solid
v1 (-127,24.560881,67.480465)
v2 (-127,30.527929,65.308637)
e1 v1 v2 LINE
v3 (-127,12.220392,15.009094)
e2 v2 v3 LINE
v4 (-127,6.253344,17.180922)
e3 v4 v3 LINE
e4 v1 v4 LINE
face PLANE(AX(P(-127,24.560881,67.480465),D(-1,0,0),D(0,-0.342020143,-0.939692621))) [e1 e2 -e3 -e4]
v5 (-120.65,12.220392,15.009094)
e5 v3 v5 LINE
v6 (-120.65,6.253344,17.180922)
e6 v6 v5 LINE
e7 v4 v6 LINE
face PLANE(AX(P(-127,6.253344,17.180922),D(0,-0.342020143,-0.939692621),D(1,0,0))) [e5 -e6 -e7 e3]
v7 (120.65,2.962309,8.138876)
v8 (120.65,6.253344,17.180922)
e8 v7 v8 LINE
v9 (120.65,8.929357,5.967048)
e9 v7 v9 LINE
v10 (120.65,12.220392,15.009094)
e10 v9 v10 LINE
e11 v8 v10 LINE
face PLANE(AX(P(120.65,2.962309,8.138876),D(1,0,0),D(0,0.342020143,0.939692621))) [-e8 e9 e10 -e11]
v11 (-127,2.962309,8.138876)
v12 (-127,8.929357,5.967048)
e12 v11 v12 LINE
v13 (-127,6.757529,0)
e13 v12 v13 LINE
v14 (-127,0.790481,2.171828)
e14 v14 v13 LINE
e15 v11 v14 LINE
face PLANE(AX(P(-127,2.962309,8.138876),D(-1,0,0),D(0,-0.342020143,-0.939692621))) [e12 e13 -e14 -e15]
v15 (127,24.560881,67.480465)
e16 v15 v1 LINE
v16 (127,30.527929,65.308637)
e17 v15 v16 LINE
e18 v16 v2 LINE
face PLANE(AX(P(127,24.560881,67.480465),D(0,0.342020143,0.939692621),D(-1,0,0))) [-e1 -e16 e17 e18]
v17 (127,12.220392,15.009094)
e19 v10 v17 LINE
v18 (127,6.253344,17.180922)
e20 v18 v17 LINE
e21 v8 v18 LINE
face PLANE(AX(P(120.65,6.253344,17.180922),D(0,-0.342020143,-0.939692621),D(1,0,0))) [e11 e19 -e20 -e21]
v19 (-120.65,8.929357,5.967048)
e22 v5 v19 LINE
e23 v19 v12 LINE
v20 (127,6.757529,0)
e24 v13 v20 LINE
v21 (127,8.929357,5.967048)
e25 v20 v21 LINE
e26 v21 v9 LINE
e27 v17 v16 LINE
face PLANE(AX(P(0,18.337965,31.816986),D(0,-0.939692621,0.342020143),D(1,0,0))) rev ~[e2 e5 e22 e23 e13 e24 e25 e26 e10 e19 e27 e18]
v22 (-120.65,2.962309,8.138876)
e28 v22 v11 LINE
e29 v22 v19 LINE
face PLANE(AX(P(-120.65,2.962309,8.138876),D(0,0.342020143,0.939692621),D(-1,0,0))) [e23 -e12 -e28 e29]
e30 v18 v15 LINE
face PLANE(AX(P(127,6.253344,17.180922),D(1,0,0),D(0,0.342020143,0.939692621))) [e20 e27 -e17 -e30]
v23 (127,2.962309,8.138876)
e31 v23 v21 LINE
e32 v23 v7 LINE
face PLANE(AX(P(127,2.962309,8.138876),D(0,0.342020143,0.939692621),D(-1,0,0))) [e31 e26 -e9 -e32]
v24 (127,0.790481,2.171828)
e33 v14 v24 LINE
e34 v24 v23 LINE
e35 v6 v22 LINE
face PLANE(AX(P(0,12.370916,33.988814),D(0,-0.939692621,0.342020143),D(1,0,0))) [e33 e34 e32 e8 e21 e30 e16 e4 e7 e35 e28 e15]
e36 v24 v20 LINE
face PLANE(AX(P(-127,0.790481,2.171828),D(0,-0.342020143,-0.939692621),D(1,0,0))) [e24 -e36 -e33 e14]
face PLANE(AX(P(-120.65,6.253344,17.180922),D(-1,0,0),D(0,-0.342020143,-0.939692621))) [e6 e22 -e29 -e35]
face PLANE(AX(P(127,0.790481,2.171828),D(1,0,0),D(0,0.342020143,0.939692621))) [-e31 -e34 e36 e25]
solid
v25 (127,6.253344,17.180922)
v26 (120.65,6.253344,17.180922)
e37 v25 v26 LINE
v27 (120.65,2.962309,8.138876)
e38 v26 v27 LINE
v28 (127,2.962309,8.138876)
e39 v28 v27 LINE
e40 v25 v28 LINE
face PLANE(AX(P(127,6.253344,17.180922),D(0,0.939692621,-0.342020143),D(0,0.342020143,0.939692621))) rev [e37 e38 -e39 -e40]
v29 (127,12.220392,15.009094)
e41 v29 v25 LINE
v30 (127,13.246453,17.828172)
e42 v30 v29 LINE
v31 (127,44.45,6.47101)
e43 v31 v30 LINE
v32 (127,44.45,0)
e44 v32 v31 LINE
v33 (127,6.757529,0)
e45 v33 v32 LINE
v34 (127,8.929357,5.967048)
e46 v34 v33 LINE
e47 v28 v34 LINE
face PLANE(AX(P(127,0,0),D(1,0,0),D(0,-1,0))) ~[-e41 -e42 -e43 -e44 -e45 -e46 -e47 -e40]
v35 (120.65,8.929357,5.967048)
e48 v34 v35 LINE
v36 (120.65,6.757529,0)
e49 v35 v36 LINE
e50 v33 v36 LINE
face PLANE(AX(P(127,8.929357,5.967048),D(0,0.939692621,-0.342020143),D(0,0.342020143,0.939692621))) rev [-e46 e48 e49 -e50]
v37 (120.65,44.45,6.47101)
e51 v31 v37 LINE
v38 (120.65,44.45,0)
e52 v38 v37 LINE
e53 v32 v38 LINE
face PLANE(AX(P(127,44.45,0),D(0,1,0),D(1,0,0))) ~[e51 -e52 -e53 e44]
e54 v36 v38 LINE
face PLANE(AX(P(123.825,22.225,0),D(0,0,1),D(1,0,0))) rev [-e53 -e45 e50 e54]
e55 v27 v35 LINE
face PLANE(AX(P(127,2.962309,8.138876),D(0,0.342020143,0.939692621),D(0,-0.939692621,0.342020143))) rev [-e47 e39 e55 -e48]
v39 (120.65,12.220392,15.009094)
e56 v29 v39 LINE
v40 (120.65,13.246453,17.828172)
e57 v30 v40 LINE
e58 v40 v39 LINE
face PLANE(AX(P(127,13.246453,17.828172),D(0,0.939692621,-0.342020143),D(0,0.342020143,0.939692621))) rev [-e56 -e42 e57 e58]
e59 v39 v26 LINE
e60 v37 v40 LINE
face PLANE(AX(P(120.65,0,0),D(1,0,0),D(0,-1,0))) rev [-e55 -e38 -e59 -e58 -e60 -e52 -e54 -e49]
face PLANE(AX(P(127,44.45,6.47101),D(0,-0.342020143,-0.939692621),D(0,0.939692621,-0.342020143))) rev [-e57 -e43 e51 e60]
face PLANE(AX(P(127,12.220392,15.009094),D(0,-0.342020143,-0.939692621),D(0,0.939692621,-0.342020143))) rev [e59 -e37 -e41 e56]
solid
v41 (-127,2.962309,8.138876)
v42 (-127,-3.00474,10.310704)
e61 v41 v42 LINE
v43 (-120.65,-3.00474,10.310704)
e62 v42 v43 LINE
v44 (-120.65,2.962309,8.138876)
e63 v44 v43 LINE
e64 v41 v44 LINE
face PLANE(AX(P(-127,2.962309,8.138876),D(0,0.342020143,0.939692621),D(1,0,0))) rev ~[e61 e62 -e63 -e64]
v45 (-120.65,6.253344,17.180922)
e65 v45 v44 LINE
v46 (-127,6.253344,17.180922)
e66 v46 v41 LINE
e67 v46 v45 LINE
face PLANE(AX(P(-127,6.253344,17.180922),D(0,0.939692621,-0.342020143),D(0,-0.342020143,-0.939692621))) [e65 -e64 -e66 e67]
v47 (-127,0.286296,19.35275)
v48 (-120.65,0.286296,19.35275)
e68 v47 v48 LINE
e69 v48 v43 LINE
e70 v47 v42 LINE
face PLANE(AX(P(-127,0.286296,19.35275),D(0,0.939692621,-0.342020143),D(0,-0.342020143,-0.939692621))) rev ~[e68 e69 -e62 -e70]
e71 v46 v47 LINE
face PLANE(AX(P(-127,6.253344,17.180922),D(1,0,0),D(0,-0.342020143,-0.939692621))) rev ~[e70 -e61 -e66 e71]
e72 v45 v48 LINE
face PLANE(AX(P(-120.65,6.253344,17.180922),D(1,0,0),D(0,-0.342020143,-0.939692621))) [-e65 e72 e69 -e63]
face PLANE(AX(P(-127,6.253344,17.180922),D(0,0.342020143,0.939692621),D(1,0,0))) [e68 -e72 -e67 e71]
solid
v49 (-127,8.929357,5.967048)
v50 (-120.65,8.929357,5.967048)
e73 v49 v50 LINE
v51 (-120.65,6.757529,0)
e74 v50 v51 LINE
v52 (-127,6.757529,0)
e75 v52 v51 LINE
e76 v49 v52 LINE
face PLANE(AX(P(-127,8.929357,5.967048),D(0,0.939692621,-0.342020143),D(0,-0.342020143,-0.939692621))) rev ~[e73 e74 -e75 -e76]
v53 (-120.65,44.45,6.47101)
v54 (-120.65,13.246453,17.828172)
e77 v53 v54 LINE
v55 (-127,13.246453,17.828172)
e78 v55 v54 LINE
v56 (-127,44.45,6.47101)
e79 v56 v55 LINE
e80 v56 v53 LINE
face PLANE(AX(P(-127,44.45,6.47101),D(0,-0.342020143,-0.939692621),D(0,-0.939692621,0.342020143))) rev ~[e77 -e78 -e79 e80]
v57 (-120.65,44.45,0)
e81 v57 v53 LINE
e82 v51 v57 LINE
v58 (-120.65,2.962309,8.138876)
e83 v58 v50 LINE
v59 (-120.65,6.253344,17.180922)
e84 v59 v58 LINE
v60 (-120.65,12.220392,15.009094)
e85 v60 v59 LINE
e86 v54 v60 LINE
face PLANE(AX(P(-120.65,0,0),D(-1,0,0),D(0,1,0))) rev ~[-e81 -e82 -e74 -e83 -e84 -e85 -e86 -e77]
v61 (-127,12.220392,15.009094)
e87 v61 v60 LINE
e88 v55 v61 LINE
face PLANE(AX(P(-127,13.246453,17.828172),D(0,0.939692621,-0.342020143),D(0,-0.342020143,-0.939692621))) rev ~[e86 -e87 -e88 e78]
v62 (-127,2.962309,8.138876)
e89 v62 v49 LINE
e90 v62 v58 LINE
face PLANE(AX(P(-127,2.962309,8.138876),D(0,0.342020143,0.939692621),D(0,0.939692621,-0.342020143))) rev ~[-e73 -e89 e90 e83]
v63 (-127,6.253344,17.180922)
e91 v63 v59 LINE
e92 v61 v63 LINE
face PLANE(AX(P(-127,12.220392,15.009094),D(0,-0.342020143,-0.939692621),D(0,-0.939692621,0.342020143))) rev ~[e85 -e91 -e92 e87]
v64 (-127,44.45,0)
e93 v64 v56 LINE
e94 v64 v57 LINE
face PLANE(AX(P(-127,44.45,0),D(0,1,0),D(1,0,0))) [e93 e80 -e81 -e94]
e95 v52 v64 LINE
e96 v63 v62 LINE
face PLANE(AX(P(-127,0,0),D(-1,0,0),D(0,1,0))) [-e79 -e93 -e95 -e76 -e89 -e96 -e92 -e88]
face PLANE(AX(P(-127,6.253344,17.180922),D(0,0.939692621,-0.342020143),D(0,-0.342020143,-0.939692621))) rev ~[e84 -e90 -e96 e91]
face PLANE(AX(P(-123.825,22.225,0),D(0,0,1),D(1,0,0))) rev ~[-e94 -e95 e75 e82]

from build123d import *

# Parameters (mm, degrees)
F0_W     = 6.35
F0_H     = 44.45
F1_DEPTH = 20
F3_DEPTH = 6.35
F6_DEPTH = 6.35
F7_DEPTH = 6.35


# Not quite as in the source:
# - a feature names something its author has since deleted; it is built from what else it names


with BuildPart() as f1:
    # F0 (on Top) → F1 (new body)
    with BuildSketch(Plane.XY):
        with Locations((-123.825, 22.225)):
            Rectangle(F0_W, F0_H)
    extrude(amount=F1_DEPTH)

    # F2 (on face) → F3 (cut, through all)
    with BuildSketch(Plane(origin=(-127, 0, 0), x_dir=(0, -1, 0), z_dir=(-1, 0, 0))):
        Polygon((-13.2464528273, 17.8281720899), (-7.2794046853, 20), (-14.0369335405, 20), align=None)
        Polygon((0, 20), (-7.2794046853, 20), (-6.2533442553, 17.1809221376), (-2.9623086233, 8.1388760521), (-0.7904807132, 2.1718279101), (-6.7575288552, 0), (0, 0), align=None)
        Polygon((-44.45, 17.8281720899), (-13.2464528273, 17.8281720899), (-14.0369335405, 20), (-44.45, 20), align=None)
        Polygon((-44.45, 6.4710097155), (-13.2464528273, 17.8281720899), (-44.45, 17.8281720899), align=None)
        Polygon((-6.2533442553, 17.1809221376), (-7.2794046853, 20), (-13.2464528273, 17.8281720899), (-12.2203923973, 15.0090942275), align=None)
        Polygon((-0.7904807132, 2.1718279101), (-2.9623086233, 8.1388760521), (-8.9293567653, 5.967048142), (-6.7575288552, 0), align=None)
    extrude(amount=-F3_DEPTH, mode=Mode.SUBTRACT)


with BuildPart() as f4_1:
    # F4: instance of F1
    add(f1.part.mirror(Plane.YZ))


with BuildPart() as f6:
    # F5 (on face) → F6 (new body)
    with BuildSketch(Plane(origin=(0, 0, 0), x_dir=(1, 0, 0), z_dir=(0, -0.9396926208, 0.3420201433))):
        Polygon((127, 8.6612109876), (120.65, 8.6612109876), (120.65, 18.2835554495), (127, 18.2835554495), (127, 71.8112109876), (-127, 71.8112109876), (-127, 18.2835554495), (-120.65, 18.2835554495), (-120.65, 8.6612109876), (-127, 8.6612109876), (-127, 2.3112109876), (127, 2.3112109876), align=None)
    extrude(amount=-F6_DEPTH)


with BuildPart() as f7:
    # F7 (new): a face of the model
    f7_faces = [f1.part.faces().sort_by_distance(p)[0] for p in [
        (-123.825, 4.6078264393, 12.6598990949),
    ]]
    extrude(f7_faces, amount=F7_DEPTH)


solid = Compound([f1.part, f4_1.part, f6.part, f7.part])
